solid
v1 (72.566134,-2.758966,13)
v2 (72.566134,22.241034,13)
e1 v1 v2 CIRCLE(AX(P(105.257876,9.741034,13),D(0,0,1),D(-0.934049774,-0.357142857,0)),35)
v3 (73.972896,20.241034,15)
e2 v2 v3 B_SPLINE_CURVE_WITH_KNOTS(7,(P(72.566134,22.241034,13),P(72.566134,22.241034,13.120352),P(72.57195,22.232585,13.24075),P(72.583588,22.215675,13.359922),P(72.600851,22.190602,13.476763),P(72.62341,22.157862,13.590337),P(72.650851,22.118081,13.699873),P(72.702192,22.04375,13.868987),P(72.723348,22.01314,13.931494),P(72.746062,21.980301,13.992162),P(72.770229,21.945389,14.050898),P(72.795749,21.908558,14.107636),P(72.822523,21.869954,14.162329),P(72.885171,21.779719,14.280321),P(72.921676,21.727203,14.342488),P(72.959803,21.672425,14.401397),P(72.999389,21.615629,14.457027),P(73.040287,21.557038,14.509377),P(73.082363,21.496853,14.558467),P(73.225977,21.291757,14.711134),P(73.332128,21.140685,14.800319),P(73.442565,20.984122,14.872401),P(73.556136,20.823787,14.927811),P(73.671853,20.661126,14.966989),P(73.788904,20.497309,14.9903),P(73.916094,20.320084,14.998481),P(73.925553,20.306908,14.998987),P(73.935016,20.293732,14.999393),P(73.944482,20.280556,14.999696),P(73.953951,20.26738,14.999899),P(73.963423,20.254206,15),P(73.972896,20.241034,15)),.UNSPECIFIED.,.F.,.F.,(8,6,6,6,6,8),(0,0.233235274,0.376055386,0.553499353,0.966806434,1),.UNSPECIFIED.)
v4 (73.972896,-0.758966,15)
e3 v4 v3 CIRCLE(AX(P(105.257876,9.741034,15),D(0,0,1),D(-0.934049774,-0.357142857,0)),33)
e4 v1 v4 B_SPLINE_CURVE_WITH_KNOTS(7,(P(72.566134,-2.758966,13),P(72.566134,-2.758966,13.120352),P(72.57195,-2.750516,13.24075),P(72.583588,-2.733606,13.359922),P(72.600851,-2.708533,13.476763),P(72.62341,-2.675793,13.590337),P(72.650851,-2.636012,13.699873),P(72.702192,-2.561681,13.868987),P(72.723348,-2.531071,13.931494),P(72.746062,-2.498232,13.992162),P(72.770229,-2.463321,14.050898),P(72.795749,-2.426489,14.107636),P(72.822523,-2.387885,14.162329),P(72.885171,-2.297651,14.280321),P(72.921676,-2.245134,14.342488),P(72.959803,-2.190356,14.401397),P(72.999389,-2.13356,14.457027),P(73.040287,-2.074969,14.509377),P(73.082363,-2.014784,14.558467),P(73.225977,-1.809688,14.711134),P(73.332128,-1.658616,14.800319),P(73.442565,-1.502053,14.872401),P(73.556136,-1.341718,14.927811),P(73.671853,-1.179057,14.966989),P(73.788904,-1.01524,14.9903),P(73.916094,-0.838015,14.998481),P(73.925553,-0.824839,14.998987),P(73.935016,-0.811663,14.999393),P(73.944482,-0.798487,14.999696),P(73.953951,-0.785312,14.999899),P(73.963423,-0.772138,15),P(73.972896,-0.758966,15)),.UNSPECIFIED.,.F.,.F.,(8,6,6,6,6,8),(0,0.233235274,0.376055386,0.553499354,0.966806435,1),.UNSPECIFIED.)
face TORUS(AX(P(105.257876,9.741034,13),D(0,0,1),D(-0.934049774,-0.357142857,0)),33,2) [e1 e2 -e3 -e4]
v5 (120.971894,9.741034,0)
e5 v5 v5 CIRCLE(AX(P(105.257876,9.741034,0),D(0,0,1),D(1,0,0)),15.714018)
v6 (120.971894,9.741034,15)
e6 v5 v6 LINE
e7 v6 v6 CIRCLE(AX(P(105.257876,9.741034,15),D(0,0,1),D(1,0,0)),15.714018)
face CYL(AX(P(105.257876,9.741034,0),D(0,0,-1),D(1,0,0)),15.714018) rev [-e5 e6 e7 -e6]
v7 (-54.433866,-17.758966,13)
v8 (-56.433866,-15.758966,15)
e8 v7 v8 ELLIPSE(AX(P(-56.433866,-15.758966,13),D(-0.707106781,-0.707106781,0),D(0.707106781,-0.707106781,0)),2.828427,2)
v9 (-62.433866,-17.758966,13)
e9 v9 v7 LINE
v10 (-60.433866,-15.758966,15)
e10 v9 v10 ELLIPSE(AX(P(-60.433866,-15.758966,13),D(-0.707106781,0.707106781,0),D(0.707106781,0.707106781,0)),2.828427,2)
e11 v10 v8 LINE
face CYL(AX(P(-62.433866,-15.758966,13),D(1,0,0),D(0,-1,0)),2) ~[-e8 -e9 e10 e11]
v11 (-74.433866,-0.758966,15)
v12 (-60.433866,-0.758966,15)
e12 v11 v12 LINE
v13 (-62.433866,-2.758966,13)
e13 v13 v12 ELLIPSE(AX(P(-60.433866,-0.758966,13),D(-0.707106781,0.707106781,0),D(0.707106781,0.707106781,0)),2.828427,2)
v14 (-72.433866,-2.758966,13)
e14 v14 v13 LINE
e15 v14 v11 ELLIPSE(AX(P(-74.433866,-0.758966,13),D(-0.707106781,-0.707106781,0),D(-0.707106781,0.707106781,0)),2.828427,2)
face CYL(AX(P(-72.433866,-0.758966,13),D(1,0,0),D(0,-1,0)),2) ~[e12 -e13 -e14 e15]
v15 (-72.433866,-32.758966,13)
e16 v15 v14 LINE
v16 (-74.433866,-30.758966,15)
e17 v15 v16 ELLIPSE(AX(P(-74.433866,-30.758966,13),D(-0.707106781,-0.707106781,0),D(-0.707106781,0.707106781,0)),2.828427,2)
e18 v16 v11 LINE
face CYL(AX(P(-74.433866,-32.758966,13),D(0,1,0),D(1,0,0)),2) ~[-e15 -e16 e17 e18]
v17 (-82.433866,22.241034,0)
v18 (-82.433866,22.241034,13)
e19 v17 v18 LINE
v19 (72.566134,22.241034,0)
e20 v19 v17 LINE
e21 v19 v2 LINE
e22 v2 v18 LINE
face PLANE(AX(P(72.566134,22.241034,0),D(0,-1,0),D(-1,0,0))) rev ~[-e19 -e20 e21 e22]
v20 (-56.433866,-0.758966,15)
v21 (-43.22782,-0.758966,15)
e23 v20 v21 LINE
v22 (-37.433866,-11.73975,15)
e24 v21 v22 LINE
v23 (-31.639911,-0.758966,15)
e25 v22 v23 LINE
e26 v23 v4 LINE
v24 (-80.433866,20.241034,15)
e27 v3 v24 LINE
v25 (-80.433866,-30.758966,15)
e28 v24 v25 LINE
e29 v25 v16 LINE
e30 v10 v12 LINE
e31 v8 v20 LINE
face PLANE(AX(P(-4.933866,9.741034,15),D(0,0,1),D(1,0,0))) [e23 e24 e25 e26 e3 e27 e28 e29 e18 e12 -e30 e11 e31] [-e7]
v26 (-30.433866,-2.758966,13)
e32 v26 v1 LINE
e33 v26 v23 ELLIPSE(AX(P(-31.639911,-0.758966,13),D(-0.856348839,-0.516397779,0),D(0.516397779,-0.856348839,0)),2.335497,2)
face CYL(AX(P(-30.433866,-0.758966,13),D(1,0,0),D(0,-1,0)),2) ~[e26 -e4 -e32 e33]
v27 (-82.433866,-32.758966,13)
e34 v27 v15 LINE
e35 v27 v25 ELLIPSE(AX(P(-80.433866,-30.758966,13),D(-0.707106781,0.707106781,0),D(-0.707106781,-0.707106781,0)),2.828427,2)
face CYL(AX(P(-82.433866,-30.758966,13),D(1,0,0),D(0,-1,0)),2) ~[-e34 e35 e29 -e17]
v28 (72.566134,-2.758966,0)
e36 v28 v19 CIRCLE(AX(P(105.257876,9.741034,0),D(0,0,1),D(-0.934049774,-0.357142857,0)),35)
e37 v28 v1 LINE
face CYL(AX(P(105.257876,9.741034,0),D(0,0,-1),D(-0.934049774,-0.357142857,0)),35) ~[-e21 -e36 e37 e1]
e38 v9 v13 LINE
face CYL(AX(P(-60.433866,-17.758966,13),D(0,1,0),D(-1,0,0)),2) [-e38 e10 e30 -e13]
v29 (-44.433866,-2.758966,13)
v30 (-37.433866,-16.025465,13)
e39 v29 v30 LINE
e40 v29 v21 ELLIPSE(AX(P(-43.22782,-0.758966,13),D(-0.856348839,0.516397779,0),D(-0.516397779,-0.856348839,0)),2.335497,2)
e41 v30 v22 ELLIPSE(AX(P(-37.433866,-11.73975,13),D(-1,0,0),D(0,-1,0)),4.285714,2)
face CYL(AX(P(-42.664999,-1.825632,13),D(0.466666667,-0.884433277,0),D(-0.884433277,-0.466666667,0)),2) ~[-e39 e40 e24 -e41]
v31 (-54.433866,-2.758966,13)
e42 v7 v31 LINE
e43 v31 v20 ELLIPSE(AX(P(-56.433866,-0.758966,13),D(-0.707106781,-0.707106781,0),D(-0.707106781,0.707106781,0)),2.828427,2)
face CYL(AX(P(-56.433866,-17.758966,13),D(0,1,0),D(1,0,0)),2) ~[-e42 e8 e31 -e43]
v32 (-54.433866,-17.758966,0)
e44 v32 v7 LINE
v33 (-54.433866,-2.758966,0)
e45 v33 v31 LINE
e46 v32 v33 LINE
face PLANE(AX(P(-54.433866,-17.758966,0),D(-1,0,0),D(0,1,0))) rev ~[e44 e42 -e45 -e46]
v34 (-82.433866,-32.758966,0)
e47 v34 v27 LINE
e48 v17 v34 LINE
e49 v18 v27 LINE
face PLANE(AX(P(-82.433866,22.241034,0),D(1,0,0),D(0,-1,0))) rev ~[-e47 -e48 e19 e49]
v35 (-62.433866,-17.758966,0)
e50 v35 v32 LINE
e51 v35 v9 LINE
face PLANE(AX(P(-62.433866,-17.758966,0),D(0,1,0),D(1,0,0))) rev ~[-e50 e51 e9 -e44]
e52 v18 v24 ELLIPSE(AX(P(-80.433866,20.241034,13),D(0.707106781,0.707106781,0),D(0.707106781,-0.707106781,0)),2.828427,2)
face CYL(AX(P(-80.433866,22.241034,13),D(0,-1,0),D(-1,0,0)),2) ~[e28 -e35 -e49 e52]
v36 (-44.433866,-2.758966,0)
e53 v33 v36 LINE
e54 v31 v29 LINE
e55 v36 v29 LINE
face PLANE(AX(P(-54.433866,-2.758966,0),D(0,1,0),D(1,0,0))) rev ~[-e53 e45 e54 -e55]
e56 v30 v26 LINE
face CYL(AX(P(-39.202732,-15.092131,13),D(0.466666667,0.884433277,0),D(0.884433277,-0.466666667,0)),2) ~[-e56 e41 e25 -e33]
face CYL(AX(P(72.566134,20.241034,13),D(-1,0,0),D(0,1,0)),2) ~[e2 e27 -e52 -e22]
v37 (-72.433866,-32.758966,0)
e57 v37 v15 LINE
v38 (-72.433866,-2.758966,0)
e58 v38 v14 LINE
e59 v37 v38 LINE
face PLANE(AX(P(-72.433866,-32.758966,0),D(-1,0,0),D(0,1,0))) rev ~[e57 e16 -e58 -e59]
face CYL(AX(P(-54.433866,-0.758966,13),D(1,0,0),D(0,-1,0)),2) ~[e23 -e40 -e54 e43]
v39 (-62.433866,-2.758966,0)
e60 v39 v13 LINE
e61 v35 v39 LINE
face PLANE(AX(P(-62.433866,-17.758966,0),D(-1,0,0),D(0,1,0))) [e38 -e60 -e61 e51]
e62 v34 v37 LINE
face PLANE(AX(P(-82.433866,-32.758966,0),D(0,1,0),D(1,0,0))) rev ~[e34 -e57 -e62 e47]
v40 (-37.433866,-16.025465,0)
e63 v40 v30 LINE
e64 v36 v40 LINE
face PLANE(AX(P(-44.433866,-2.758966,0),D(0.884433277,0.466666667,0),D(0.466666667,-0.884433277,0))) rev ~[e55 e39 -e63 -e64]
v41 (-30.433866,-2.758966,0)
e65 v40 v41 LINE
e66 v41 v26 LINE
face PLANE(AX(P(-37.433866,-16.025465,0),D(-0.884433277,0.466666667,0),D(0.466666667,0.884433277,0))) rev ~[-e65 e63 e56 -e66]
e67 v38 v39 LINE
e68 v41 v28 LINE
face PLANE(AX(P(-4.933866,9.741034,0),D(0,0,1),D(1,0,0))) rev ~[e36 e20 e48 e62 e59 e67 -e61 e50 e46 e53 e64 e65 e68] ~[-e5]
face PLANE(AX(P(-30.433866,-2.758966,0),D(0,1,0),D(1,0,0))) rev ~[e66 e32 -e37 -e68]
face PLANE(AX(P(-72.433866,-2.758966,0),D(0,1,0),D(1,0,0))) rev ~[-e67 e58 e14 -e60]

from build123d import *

# Parameters (mm, degrees)
F0_W     = 10
F0_H     = 30
F0_W_2   = 8
F0_H_2   = 15
F0_R     = 15.7140180489
F1_DEPTH = 15
F2_R     = 2


with BuildPart() as f1:
    # F0 (on Top) → F1 (new body)
    with BuildSketch(Plane.XY):
        Polygon((72.5661343038, 22.2410344053), (-82.4338656962, 22.2410344053), (-82.4338656962, -2.7589655947), (-72.4338656962, -2.7589655947), (-62.4338656962, -2.7589655947), (-54.4338656962, -2.7589655947), (-44.4338656962, -2.7589655947), (-30.4338656962, -2.7589655947), (72.5661343038, -2.7589655947), align=None)
        with Locations((-77.4338656962, -17.7589655947)):
            Rectangle(F0_W, F0_H)
        with Locations((-58.4338656962, -10.2589655947)):
            Rectangle(F0_W_2, F0_H_2)
        Polygon((-37.4338656962, -16.0254647561), (-30.4338656962, -2.7589655947), (-44.4338656962, -2.7589655947), align=None)
        with BuildLine():
            ThreePointArc((72.5661343038, -2.7589655947), (140.2578763804, 9.7410344053), (72.5661343038, 22.2410344053))
            Line((72.5661343038, 22.2410344053), (72.5661343038, -2.7589655947))
        make_face()
        with Locations((105.2578763804, 9.7410344053)):
            Circle(F0_R, mode=Mode.SUBTRACT)
    extrude(amount=F1_DEPTH)

    # F2
    f2_edges = [f1.edges().sort_by_distance(p)[0] for p in [
        (-82.433866, -5.258966, 15),
        (-4.933866, 22.241034, 15),
        (-72.433866, -17.758966, 15),
        (-77.433866, -32.758966, 15),
        (-67.433866, -2.758966, 15),
        (-62.433866, -10.258966, 15),
        (-58.433866, -17.758966, 15),
        (-54.433866, -10.258966, 15),
        (-40.933866, -9.392215, 15),
        (21.066134, -2.758966, 15),
        (-33.933866, -9.392215, 15),
        (140.257876, 9.741034, 15),
        (-49.433866, -2.758966, 15),
    ]]
    fillet(f2_edges, radius=F2_R)


solid = f1.part
